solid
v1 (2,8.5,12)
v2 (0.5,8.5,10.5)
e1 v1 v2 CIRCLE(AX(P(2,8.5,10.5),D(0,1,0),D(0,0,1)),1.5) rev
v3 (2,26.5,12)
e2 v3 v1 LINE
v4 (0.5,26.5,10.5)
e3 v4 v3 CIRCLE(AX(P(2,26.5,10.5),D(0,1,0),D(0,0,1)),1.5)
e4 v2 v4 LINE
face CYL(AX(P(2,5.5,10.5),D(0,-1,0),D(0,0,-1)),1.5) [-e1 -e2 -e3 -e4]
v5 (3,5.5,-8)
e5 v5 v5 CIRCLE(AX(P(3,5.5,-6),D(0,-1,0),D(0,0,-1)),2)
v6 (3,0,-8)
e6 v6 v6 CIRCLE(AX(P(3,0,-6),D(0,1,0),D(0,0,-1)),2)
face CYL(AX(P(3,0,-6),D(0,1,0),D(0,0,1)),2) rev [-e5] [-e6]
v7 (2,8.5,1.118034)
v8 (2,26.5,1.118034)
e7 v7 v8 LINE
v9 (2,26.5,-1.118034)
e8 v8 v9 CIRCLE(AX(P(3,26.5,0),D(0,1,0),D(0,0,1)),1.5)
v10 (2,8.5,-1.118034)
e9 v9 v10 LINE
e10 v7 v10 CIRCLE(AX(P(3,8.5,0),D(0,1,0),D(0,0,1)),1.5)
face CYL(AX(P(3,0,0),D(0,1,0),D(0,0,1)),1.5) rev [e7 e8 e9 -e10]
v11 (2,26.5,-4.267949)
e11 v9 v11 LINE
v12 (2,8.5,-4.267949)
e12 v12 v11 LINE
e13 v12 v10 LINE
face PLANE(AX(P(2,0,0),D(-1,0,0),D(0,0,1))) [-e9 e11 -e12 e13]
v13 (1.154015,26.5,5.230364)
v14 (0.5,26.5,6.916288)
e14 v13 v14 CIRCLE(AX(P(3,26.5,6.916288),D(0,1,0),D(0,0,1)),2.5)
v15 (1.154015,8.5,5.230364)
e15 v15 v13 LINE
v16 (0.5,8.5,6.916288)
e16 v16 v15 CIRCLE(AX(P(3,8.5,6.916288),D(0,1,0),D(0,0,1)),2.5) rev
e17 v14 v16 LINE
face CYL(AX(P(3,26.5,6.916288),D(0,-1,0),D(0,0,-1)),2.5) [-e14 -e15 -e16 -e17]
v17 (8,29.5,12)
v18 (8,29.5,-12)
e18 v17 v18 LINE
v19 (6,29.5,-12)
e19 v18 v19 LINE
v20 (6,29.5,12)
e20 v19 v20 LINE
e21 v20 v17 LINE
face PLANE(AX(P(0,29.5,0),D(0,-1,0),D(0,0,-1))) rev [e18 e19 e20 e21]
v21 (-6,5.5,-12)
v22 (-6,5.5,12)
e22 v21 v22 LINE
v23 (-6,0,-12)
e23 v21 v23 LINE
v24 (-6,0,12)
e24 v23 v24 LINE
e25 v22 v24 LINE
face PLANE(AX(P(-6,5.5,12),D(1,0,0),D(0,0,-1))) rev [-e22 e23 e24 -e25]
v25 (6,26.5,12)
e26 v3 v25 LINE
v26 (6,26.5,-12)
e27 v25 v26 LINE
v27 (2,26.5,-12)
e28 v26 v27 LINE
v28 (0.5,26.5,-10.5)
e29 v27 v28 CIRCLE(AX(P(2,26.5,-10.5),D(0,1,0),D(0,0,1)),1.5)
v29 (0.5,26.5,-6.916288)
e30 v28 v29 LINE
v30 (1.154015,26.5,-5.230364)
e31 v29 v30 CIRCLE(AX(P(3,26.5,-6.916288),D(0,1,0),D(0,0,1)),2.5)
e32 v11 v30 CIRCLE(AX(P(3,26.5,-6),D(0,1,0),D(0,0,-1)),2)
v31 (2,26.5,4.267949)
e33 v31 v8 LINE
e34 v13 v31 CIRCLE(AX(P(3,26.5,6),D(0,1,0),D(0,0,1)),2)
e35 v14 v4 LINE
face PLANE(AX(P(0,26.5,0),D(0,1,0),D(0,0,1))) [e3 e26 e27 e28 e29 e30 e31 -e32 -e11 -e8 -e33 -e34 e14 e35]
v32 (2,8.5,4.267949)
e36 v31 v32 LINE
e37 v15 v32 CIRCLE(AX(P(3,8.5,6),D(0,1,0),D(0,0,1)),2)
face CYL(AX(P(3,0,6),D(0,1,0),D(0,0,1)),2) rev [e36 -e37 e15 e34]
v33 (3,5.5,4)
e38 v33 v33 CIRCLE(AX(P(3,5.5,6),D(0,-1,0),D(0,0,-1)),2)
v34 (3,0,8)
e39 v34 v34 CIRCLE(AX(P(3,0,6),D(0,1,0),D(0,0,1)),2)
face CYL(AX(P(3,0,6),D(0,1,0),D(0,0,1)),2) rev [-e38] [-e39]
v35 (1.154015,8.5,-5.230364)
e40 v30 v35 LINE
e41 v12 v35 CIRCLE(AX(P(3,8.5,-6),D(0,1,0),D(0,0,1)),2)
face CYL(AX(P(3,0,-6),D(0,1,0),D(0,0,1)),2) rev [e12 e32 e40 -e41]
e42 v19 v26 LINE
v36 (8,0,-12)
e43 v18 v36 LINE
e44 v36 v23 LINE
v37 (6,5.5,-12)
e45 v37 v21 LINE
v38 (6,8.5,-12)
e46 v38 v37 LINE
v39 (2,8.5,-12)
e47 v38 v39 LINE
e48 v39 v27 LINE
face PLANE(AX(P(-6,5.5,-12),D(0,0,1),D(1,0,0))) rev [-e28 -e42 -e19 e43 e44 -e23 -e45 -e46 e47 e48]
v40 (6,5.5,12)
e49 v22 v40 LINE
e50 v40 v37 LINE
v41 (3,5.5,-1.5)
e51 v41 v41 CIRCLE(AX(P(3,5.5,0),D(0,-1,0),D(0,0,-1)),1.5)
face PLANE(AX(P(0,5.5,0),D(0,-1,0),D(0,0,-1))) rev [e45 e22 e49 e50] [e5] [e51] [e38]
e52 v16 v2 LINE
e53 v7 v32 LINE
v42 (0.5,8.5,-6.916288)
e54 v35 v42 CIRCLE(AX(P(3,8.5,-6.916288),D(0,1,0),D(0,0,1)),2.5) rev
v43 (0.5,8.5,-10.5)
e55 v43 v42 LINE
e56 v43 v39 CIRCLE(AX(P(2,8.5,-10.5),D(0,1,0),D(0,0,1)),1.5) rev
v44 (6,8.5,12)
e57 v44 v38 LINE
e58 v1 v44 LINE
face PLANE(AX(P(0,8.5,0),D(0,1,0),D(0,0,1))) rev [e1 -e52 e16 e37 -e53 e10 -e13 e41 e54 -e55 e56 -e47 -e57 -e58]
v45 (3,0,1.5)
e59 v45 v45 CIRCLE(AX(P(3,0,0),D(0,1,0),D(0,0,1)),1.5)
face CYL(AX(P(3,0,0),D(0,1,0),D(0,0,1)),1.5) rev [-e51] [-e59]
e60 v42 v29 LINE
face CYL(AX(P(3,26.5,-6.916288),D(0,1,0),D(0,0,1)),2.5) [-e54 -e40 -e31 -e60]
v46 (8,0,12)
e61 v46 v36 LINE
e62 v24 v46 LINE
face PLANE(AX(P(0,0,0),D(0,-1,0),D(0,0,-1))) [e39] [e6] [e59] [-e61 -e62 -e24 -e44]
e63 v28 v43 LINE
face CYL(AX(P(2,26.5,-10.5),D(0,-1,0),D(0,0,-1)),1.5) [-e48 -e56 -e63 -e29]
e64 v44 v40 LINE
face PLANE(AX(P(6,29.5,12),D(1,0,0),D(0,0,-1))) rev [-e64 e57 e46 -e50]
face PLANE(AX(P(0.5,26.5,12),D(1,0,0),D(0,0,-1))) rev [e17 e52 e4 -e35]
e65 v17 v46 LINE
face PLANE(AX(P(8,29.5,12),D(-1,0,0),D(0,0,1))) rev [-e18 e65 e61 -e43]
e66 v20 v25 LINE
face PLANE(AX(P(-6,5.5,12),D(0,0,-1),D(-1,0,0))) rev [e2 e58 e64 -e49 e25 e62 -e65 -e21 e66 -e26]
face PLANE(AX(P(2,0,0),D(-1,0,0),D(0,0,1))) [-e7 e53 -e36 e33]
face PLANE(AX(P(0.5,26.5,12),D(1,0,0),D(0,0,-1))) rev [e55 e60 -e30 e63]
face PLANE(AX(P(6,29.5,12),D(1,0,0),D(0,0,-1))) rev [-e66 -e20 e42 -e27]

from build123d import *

# Parameters (mm, degrees)
SKETCH1_W           = 12
SKETCH1_H           = 24
BOSS_EXTRUDE1_DEPTH = 5.5
SKETCH2_W           = 2
SKETCH2_H           = 24
BOSS_EXTRUDE2_DEPTH = 29.5
BOSS_EXTRUDE4_START = 3
SKETCH4_W           = 5.5
SKETCH4_H           = 24
BOSS_EXTRUDE4_DEPTH = 18
SKETCH5_W           = 9.25
SKETCH5_H           = 18
CUT_EXTRUDE1_DEPTH  = 1.5
FILLET1_R           = 2.5
SKETCH6_R           = 2
SKETCH6_R_2         = 1.5
CUT_EXTRUDE2_DEPTH  = 31.170349683
FILLET2_R           = 1.5


with BuildPart() as part:
    # Sketch1 → Boss-Extrude1 (new body)
    with BuildSketch(Plane(origin=(0, 0, 0), x_dir=(1, 0, 0), z_dir=(0, 1, 0))):
        Rectangle(SKETCH1_W, SKETCH1_H)
    extrude(amount=BOSS_EXTRUDE1_DEPTH)

    # Sketch2 → Boss-Extrude2 (add)
    with BuildSketch(Plane(origin=(0, 0, 0), x_dir=(1, 0, 0), z_dir=(0, 1, 0))):
        with Locations((7, 0)):
            Rectangle(SKETCH2_W, SKETCH2_H)
    extrude(amount=BOSS_EXTRUDE2_DEPTH)

    # Sketch4 → Boss-Extrude4 (add)
    with BuildSketch(Plane(origin=(0, 5.5, 0), x_dir=(1, 0, 0), z_dir=(0, 1, 0)).offset(BOSS_EXTRUDE4_START)):
        with Locations((3.25, 0)):
            Rectangle(SKETCH4_W, SKETCH4_H)
    extrude(amount=BOSS_EXTRUDE4_DEPTH)

    # Sketch5 → Cut-Extrude1 (cut)
    with BuildSketch(Plane.ZY.offset(-0.5)):
        with Locations((0, 17.5)):
            Rectangle(SKETCH5_W, SKETCH5_H)
    extrude(amount=-CUT_EXTRUDE1_DEPTH, mode=Mode.SUBTRACT)

    # Fillet1
    # the kernel refuses this fillet: 2.5 mm, written as the material it takes off along each edge
    with BuildSketch(Plane(origin=(0.5, 32.228219619, 4.625), x_dir=(0, 0, 1), z_dir=(0, -1, 0)), Plane(origin=(0.5, 8.5, -4.625), x_dir=(0, 0, -1), z_dir=(0, 1, 0))) as fillet1_piece_1:
        with BuildLine():
            CenterArc((2.291287847, -2.5), FILLET1_R, 90, 66.421821522)
            Line((0, -1.5), (0, 0))
            Line((0, 0), (2.291287847, 0))
        make_face()
    extrude(amount=23.728219619, mode=Mode.SUBTRACT)

    # Sketch6 → Cut-Extrude2 (cut, through all)
    with BuildSketch(Plane(origin=(0, 26.5, 0), x_dir=(1, 0, 0), z_dir=(0, 1, 0))):
        with Locations(Location((3, -6, 0), (0, 0, 270))):
            Circle(SKETCH6_R)
        with Locations(Location((3, 6, 0), (0, 0, 90))):
            Circle(SKETCH6_R)
        with Locations(Location((3, 0, 0), (0, 0, 270))):
            Circle(SKETCH6_R_2)
    extrude(amount=-CUT_EXTRUDE2_DEPTH, mode=Mode.SUBTRACT)

    # Fillet2
    fillet2_edges = [part.edges().sort_by_distance(p)[0] for p in [
        (0.5, 17.5, -12),
        (0.5, 17.5, 12),
    ]]
    fillet(fillet2_edges, radius=FILLET2_R)


solid = part.part
